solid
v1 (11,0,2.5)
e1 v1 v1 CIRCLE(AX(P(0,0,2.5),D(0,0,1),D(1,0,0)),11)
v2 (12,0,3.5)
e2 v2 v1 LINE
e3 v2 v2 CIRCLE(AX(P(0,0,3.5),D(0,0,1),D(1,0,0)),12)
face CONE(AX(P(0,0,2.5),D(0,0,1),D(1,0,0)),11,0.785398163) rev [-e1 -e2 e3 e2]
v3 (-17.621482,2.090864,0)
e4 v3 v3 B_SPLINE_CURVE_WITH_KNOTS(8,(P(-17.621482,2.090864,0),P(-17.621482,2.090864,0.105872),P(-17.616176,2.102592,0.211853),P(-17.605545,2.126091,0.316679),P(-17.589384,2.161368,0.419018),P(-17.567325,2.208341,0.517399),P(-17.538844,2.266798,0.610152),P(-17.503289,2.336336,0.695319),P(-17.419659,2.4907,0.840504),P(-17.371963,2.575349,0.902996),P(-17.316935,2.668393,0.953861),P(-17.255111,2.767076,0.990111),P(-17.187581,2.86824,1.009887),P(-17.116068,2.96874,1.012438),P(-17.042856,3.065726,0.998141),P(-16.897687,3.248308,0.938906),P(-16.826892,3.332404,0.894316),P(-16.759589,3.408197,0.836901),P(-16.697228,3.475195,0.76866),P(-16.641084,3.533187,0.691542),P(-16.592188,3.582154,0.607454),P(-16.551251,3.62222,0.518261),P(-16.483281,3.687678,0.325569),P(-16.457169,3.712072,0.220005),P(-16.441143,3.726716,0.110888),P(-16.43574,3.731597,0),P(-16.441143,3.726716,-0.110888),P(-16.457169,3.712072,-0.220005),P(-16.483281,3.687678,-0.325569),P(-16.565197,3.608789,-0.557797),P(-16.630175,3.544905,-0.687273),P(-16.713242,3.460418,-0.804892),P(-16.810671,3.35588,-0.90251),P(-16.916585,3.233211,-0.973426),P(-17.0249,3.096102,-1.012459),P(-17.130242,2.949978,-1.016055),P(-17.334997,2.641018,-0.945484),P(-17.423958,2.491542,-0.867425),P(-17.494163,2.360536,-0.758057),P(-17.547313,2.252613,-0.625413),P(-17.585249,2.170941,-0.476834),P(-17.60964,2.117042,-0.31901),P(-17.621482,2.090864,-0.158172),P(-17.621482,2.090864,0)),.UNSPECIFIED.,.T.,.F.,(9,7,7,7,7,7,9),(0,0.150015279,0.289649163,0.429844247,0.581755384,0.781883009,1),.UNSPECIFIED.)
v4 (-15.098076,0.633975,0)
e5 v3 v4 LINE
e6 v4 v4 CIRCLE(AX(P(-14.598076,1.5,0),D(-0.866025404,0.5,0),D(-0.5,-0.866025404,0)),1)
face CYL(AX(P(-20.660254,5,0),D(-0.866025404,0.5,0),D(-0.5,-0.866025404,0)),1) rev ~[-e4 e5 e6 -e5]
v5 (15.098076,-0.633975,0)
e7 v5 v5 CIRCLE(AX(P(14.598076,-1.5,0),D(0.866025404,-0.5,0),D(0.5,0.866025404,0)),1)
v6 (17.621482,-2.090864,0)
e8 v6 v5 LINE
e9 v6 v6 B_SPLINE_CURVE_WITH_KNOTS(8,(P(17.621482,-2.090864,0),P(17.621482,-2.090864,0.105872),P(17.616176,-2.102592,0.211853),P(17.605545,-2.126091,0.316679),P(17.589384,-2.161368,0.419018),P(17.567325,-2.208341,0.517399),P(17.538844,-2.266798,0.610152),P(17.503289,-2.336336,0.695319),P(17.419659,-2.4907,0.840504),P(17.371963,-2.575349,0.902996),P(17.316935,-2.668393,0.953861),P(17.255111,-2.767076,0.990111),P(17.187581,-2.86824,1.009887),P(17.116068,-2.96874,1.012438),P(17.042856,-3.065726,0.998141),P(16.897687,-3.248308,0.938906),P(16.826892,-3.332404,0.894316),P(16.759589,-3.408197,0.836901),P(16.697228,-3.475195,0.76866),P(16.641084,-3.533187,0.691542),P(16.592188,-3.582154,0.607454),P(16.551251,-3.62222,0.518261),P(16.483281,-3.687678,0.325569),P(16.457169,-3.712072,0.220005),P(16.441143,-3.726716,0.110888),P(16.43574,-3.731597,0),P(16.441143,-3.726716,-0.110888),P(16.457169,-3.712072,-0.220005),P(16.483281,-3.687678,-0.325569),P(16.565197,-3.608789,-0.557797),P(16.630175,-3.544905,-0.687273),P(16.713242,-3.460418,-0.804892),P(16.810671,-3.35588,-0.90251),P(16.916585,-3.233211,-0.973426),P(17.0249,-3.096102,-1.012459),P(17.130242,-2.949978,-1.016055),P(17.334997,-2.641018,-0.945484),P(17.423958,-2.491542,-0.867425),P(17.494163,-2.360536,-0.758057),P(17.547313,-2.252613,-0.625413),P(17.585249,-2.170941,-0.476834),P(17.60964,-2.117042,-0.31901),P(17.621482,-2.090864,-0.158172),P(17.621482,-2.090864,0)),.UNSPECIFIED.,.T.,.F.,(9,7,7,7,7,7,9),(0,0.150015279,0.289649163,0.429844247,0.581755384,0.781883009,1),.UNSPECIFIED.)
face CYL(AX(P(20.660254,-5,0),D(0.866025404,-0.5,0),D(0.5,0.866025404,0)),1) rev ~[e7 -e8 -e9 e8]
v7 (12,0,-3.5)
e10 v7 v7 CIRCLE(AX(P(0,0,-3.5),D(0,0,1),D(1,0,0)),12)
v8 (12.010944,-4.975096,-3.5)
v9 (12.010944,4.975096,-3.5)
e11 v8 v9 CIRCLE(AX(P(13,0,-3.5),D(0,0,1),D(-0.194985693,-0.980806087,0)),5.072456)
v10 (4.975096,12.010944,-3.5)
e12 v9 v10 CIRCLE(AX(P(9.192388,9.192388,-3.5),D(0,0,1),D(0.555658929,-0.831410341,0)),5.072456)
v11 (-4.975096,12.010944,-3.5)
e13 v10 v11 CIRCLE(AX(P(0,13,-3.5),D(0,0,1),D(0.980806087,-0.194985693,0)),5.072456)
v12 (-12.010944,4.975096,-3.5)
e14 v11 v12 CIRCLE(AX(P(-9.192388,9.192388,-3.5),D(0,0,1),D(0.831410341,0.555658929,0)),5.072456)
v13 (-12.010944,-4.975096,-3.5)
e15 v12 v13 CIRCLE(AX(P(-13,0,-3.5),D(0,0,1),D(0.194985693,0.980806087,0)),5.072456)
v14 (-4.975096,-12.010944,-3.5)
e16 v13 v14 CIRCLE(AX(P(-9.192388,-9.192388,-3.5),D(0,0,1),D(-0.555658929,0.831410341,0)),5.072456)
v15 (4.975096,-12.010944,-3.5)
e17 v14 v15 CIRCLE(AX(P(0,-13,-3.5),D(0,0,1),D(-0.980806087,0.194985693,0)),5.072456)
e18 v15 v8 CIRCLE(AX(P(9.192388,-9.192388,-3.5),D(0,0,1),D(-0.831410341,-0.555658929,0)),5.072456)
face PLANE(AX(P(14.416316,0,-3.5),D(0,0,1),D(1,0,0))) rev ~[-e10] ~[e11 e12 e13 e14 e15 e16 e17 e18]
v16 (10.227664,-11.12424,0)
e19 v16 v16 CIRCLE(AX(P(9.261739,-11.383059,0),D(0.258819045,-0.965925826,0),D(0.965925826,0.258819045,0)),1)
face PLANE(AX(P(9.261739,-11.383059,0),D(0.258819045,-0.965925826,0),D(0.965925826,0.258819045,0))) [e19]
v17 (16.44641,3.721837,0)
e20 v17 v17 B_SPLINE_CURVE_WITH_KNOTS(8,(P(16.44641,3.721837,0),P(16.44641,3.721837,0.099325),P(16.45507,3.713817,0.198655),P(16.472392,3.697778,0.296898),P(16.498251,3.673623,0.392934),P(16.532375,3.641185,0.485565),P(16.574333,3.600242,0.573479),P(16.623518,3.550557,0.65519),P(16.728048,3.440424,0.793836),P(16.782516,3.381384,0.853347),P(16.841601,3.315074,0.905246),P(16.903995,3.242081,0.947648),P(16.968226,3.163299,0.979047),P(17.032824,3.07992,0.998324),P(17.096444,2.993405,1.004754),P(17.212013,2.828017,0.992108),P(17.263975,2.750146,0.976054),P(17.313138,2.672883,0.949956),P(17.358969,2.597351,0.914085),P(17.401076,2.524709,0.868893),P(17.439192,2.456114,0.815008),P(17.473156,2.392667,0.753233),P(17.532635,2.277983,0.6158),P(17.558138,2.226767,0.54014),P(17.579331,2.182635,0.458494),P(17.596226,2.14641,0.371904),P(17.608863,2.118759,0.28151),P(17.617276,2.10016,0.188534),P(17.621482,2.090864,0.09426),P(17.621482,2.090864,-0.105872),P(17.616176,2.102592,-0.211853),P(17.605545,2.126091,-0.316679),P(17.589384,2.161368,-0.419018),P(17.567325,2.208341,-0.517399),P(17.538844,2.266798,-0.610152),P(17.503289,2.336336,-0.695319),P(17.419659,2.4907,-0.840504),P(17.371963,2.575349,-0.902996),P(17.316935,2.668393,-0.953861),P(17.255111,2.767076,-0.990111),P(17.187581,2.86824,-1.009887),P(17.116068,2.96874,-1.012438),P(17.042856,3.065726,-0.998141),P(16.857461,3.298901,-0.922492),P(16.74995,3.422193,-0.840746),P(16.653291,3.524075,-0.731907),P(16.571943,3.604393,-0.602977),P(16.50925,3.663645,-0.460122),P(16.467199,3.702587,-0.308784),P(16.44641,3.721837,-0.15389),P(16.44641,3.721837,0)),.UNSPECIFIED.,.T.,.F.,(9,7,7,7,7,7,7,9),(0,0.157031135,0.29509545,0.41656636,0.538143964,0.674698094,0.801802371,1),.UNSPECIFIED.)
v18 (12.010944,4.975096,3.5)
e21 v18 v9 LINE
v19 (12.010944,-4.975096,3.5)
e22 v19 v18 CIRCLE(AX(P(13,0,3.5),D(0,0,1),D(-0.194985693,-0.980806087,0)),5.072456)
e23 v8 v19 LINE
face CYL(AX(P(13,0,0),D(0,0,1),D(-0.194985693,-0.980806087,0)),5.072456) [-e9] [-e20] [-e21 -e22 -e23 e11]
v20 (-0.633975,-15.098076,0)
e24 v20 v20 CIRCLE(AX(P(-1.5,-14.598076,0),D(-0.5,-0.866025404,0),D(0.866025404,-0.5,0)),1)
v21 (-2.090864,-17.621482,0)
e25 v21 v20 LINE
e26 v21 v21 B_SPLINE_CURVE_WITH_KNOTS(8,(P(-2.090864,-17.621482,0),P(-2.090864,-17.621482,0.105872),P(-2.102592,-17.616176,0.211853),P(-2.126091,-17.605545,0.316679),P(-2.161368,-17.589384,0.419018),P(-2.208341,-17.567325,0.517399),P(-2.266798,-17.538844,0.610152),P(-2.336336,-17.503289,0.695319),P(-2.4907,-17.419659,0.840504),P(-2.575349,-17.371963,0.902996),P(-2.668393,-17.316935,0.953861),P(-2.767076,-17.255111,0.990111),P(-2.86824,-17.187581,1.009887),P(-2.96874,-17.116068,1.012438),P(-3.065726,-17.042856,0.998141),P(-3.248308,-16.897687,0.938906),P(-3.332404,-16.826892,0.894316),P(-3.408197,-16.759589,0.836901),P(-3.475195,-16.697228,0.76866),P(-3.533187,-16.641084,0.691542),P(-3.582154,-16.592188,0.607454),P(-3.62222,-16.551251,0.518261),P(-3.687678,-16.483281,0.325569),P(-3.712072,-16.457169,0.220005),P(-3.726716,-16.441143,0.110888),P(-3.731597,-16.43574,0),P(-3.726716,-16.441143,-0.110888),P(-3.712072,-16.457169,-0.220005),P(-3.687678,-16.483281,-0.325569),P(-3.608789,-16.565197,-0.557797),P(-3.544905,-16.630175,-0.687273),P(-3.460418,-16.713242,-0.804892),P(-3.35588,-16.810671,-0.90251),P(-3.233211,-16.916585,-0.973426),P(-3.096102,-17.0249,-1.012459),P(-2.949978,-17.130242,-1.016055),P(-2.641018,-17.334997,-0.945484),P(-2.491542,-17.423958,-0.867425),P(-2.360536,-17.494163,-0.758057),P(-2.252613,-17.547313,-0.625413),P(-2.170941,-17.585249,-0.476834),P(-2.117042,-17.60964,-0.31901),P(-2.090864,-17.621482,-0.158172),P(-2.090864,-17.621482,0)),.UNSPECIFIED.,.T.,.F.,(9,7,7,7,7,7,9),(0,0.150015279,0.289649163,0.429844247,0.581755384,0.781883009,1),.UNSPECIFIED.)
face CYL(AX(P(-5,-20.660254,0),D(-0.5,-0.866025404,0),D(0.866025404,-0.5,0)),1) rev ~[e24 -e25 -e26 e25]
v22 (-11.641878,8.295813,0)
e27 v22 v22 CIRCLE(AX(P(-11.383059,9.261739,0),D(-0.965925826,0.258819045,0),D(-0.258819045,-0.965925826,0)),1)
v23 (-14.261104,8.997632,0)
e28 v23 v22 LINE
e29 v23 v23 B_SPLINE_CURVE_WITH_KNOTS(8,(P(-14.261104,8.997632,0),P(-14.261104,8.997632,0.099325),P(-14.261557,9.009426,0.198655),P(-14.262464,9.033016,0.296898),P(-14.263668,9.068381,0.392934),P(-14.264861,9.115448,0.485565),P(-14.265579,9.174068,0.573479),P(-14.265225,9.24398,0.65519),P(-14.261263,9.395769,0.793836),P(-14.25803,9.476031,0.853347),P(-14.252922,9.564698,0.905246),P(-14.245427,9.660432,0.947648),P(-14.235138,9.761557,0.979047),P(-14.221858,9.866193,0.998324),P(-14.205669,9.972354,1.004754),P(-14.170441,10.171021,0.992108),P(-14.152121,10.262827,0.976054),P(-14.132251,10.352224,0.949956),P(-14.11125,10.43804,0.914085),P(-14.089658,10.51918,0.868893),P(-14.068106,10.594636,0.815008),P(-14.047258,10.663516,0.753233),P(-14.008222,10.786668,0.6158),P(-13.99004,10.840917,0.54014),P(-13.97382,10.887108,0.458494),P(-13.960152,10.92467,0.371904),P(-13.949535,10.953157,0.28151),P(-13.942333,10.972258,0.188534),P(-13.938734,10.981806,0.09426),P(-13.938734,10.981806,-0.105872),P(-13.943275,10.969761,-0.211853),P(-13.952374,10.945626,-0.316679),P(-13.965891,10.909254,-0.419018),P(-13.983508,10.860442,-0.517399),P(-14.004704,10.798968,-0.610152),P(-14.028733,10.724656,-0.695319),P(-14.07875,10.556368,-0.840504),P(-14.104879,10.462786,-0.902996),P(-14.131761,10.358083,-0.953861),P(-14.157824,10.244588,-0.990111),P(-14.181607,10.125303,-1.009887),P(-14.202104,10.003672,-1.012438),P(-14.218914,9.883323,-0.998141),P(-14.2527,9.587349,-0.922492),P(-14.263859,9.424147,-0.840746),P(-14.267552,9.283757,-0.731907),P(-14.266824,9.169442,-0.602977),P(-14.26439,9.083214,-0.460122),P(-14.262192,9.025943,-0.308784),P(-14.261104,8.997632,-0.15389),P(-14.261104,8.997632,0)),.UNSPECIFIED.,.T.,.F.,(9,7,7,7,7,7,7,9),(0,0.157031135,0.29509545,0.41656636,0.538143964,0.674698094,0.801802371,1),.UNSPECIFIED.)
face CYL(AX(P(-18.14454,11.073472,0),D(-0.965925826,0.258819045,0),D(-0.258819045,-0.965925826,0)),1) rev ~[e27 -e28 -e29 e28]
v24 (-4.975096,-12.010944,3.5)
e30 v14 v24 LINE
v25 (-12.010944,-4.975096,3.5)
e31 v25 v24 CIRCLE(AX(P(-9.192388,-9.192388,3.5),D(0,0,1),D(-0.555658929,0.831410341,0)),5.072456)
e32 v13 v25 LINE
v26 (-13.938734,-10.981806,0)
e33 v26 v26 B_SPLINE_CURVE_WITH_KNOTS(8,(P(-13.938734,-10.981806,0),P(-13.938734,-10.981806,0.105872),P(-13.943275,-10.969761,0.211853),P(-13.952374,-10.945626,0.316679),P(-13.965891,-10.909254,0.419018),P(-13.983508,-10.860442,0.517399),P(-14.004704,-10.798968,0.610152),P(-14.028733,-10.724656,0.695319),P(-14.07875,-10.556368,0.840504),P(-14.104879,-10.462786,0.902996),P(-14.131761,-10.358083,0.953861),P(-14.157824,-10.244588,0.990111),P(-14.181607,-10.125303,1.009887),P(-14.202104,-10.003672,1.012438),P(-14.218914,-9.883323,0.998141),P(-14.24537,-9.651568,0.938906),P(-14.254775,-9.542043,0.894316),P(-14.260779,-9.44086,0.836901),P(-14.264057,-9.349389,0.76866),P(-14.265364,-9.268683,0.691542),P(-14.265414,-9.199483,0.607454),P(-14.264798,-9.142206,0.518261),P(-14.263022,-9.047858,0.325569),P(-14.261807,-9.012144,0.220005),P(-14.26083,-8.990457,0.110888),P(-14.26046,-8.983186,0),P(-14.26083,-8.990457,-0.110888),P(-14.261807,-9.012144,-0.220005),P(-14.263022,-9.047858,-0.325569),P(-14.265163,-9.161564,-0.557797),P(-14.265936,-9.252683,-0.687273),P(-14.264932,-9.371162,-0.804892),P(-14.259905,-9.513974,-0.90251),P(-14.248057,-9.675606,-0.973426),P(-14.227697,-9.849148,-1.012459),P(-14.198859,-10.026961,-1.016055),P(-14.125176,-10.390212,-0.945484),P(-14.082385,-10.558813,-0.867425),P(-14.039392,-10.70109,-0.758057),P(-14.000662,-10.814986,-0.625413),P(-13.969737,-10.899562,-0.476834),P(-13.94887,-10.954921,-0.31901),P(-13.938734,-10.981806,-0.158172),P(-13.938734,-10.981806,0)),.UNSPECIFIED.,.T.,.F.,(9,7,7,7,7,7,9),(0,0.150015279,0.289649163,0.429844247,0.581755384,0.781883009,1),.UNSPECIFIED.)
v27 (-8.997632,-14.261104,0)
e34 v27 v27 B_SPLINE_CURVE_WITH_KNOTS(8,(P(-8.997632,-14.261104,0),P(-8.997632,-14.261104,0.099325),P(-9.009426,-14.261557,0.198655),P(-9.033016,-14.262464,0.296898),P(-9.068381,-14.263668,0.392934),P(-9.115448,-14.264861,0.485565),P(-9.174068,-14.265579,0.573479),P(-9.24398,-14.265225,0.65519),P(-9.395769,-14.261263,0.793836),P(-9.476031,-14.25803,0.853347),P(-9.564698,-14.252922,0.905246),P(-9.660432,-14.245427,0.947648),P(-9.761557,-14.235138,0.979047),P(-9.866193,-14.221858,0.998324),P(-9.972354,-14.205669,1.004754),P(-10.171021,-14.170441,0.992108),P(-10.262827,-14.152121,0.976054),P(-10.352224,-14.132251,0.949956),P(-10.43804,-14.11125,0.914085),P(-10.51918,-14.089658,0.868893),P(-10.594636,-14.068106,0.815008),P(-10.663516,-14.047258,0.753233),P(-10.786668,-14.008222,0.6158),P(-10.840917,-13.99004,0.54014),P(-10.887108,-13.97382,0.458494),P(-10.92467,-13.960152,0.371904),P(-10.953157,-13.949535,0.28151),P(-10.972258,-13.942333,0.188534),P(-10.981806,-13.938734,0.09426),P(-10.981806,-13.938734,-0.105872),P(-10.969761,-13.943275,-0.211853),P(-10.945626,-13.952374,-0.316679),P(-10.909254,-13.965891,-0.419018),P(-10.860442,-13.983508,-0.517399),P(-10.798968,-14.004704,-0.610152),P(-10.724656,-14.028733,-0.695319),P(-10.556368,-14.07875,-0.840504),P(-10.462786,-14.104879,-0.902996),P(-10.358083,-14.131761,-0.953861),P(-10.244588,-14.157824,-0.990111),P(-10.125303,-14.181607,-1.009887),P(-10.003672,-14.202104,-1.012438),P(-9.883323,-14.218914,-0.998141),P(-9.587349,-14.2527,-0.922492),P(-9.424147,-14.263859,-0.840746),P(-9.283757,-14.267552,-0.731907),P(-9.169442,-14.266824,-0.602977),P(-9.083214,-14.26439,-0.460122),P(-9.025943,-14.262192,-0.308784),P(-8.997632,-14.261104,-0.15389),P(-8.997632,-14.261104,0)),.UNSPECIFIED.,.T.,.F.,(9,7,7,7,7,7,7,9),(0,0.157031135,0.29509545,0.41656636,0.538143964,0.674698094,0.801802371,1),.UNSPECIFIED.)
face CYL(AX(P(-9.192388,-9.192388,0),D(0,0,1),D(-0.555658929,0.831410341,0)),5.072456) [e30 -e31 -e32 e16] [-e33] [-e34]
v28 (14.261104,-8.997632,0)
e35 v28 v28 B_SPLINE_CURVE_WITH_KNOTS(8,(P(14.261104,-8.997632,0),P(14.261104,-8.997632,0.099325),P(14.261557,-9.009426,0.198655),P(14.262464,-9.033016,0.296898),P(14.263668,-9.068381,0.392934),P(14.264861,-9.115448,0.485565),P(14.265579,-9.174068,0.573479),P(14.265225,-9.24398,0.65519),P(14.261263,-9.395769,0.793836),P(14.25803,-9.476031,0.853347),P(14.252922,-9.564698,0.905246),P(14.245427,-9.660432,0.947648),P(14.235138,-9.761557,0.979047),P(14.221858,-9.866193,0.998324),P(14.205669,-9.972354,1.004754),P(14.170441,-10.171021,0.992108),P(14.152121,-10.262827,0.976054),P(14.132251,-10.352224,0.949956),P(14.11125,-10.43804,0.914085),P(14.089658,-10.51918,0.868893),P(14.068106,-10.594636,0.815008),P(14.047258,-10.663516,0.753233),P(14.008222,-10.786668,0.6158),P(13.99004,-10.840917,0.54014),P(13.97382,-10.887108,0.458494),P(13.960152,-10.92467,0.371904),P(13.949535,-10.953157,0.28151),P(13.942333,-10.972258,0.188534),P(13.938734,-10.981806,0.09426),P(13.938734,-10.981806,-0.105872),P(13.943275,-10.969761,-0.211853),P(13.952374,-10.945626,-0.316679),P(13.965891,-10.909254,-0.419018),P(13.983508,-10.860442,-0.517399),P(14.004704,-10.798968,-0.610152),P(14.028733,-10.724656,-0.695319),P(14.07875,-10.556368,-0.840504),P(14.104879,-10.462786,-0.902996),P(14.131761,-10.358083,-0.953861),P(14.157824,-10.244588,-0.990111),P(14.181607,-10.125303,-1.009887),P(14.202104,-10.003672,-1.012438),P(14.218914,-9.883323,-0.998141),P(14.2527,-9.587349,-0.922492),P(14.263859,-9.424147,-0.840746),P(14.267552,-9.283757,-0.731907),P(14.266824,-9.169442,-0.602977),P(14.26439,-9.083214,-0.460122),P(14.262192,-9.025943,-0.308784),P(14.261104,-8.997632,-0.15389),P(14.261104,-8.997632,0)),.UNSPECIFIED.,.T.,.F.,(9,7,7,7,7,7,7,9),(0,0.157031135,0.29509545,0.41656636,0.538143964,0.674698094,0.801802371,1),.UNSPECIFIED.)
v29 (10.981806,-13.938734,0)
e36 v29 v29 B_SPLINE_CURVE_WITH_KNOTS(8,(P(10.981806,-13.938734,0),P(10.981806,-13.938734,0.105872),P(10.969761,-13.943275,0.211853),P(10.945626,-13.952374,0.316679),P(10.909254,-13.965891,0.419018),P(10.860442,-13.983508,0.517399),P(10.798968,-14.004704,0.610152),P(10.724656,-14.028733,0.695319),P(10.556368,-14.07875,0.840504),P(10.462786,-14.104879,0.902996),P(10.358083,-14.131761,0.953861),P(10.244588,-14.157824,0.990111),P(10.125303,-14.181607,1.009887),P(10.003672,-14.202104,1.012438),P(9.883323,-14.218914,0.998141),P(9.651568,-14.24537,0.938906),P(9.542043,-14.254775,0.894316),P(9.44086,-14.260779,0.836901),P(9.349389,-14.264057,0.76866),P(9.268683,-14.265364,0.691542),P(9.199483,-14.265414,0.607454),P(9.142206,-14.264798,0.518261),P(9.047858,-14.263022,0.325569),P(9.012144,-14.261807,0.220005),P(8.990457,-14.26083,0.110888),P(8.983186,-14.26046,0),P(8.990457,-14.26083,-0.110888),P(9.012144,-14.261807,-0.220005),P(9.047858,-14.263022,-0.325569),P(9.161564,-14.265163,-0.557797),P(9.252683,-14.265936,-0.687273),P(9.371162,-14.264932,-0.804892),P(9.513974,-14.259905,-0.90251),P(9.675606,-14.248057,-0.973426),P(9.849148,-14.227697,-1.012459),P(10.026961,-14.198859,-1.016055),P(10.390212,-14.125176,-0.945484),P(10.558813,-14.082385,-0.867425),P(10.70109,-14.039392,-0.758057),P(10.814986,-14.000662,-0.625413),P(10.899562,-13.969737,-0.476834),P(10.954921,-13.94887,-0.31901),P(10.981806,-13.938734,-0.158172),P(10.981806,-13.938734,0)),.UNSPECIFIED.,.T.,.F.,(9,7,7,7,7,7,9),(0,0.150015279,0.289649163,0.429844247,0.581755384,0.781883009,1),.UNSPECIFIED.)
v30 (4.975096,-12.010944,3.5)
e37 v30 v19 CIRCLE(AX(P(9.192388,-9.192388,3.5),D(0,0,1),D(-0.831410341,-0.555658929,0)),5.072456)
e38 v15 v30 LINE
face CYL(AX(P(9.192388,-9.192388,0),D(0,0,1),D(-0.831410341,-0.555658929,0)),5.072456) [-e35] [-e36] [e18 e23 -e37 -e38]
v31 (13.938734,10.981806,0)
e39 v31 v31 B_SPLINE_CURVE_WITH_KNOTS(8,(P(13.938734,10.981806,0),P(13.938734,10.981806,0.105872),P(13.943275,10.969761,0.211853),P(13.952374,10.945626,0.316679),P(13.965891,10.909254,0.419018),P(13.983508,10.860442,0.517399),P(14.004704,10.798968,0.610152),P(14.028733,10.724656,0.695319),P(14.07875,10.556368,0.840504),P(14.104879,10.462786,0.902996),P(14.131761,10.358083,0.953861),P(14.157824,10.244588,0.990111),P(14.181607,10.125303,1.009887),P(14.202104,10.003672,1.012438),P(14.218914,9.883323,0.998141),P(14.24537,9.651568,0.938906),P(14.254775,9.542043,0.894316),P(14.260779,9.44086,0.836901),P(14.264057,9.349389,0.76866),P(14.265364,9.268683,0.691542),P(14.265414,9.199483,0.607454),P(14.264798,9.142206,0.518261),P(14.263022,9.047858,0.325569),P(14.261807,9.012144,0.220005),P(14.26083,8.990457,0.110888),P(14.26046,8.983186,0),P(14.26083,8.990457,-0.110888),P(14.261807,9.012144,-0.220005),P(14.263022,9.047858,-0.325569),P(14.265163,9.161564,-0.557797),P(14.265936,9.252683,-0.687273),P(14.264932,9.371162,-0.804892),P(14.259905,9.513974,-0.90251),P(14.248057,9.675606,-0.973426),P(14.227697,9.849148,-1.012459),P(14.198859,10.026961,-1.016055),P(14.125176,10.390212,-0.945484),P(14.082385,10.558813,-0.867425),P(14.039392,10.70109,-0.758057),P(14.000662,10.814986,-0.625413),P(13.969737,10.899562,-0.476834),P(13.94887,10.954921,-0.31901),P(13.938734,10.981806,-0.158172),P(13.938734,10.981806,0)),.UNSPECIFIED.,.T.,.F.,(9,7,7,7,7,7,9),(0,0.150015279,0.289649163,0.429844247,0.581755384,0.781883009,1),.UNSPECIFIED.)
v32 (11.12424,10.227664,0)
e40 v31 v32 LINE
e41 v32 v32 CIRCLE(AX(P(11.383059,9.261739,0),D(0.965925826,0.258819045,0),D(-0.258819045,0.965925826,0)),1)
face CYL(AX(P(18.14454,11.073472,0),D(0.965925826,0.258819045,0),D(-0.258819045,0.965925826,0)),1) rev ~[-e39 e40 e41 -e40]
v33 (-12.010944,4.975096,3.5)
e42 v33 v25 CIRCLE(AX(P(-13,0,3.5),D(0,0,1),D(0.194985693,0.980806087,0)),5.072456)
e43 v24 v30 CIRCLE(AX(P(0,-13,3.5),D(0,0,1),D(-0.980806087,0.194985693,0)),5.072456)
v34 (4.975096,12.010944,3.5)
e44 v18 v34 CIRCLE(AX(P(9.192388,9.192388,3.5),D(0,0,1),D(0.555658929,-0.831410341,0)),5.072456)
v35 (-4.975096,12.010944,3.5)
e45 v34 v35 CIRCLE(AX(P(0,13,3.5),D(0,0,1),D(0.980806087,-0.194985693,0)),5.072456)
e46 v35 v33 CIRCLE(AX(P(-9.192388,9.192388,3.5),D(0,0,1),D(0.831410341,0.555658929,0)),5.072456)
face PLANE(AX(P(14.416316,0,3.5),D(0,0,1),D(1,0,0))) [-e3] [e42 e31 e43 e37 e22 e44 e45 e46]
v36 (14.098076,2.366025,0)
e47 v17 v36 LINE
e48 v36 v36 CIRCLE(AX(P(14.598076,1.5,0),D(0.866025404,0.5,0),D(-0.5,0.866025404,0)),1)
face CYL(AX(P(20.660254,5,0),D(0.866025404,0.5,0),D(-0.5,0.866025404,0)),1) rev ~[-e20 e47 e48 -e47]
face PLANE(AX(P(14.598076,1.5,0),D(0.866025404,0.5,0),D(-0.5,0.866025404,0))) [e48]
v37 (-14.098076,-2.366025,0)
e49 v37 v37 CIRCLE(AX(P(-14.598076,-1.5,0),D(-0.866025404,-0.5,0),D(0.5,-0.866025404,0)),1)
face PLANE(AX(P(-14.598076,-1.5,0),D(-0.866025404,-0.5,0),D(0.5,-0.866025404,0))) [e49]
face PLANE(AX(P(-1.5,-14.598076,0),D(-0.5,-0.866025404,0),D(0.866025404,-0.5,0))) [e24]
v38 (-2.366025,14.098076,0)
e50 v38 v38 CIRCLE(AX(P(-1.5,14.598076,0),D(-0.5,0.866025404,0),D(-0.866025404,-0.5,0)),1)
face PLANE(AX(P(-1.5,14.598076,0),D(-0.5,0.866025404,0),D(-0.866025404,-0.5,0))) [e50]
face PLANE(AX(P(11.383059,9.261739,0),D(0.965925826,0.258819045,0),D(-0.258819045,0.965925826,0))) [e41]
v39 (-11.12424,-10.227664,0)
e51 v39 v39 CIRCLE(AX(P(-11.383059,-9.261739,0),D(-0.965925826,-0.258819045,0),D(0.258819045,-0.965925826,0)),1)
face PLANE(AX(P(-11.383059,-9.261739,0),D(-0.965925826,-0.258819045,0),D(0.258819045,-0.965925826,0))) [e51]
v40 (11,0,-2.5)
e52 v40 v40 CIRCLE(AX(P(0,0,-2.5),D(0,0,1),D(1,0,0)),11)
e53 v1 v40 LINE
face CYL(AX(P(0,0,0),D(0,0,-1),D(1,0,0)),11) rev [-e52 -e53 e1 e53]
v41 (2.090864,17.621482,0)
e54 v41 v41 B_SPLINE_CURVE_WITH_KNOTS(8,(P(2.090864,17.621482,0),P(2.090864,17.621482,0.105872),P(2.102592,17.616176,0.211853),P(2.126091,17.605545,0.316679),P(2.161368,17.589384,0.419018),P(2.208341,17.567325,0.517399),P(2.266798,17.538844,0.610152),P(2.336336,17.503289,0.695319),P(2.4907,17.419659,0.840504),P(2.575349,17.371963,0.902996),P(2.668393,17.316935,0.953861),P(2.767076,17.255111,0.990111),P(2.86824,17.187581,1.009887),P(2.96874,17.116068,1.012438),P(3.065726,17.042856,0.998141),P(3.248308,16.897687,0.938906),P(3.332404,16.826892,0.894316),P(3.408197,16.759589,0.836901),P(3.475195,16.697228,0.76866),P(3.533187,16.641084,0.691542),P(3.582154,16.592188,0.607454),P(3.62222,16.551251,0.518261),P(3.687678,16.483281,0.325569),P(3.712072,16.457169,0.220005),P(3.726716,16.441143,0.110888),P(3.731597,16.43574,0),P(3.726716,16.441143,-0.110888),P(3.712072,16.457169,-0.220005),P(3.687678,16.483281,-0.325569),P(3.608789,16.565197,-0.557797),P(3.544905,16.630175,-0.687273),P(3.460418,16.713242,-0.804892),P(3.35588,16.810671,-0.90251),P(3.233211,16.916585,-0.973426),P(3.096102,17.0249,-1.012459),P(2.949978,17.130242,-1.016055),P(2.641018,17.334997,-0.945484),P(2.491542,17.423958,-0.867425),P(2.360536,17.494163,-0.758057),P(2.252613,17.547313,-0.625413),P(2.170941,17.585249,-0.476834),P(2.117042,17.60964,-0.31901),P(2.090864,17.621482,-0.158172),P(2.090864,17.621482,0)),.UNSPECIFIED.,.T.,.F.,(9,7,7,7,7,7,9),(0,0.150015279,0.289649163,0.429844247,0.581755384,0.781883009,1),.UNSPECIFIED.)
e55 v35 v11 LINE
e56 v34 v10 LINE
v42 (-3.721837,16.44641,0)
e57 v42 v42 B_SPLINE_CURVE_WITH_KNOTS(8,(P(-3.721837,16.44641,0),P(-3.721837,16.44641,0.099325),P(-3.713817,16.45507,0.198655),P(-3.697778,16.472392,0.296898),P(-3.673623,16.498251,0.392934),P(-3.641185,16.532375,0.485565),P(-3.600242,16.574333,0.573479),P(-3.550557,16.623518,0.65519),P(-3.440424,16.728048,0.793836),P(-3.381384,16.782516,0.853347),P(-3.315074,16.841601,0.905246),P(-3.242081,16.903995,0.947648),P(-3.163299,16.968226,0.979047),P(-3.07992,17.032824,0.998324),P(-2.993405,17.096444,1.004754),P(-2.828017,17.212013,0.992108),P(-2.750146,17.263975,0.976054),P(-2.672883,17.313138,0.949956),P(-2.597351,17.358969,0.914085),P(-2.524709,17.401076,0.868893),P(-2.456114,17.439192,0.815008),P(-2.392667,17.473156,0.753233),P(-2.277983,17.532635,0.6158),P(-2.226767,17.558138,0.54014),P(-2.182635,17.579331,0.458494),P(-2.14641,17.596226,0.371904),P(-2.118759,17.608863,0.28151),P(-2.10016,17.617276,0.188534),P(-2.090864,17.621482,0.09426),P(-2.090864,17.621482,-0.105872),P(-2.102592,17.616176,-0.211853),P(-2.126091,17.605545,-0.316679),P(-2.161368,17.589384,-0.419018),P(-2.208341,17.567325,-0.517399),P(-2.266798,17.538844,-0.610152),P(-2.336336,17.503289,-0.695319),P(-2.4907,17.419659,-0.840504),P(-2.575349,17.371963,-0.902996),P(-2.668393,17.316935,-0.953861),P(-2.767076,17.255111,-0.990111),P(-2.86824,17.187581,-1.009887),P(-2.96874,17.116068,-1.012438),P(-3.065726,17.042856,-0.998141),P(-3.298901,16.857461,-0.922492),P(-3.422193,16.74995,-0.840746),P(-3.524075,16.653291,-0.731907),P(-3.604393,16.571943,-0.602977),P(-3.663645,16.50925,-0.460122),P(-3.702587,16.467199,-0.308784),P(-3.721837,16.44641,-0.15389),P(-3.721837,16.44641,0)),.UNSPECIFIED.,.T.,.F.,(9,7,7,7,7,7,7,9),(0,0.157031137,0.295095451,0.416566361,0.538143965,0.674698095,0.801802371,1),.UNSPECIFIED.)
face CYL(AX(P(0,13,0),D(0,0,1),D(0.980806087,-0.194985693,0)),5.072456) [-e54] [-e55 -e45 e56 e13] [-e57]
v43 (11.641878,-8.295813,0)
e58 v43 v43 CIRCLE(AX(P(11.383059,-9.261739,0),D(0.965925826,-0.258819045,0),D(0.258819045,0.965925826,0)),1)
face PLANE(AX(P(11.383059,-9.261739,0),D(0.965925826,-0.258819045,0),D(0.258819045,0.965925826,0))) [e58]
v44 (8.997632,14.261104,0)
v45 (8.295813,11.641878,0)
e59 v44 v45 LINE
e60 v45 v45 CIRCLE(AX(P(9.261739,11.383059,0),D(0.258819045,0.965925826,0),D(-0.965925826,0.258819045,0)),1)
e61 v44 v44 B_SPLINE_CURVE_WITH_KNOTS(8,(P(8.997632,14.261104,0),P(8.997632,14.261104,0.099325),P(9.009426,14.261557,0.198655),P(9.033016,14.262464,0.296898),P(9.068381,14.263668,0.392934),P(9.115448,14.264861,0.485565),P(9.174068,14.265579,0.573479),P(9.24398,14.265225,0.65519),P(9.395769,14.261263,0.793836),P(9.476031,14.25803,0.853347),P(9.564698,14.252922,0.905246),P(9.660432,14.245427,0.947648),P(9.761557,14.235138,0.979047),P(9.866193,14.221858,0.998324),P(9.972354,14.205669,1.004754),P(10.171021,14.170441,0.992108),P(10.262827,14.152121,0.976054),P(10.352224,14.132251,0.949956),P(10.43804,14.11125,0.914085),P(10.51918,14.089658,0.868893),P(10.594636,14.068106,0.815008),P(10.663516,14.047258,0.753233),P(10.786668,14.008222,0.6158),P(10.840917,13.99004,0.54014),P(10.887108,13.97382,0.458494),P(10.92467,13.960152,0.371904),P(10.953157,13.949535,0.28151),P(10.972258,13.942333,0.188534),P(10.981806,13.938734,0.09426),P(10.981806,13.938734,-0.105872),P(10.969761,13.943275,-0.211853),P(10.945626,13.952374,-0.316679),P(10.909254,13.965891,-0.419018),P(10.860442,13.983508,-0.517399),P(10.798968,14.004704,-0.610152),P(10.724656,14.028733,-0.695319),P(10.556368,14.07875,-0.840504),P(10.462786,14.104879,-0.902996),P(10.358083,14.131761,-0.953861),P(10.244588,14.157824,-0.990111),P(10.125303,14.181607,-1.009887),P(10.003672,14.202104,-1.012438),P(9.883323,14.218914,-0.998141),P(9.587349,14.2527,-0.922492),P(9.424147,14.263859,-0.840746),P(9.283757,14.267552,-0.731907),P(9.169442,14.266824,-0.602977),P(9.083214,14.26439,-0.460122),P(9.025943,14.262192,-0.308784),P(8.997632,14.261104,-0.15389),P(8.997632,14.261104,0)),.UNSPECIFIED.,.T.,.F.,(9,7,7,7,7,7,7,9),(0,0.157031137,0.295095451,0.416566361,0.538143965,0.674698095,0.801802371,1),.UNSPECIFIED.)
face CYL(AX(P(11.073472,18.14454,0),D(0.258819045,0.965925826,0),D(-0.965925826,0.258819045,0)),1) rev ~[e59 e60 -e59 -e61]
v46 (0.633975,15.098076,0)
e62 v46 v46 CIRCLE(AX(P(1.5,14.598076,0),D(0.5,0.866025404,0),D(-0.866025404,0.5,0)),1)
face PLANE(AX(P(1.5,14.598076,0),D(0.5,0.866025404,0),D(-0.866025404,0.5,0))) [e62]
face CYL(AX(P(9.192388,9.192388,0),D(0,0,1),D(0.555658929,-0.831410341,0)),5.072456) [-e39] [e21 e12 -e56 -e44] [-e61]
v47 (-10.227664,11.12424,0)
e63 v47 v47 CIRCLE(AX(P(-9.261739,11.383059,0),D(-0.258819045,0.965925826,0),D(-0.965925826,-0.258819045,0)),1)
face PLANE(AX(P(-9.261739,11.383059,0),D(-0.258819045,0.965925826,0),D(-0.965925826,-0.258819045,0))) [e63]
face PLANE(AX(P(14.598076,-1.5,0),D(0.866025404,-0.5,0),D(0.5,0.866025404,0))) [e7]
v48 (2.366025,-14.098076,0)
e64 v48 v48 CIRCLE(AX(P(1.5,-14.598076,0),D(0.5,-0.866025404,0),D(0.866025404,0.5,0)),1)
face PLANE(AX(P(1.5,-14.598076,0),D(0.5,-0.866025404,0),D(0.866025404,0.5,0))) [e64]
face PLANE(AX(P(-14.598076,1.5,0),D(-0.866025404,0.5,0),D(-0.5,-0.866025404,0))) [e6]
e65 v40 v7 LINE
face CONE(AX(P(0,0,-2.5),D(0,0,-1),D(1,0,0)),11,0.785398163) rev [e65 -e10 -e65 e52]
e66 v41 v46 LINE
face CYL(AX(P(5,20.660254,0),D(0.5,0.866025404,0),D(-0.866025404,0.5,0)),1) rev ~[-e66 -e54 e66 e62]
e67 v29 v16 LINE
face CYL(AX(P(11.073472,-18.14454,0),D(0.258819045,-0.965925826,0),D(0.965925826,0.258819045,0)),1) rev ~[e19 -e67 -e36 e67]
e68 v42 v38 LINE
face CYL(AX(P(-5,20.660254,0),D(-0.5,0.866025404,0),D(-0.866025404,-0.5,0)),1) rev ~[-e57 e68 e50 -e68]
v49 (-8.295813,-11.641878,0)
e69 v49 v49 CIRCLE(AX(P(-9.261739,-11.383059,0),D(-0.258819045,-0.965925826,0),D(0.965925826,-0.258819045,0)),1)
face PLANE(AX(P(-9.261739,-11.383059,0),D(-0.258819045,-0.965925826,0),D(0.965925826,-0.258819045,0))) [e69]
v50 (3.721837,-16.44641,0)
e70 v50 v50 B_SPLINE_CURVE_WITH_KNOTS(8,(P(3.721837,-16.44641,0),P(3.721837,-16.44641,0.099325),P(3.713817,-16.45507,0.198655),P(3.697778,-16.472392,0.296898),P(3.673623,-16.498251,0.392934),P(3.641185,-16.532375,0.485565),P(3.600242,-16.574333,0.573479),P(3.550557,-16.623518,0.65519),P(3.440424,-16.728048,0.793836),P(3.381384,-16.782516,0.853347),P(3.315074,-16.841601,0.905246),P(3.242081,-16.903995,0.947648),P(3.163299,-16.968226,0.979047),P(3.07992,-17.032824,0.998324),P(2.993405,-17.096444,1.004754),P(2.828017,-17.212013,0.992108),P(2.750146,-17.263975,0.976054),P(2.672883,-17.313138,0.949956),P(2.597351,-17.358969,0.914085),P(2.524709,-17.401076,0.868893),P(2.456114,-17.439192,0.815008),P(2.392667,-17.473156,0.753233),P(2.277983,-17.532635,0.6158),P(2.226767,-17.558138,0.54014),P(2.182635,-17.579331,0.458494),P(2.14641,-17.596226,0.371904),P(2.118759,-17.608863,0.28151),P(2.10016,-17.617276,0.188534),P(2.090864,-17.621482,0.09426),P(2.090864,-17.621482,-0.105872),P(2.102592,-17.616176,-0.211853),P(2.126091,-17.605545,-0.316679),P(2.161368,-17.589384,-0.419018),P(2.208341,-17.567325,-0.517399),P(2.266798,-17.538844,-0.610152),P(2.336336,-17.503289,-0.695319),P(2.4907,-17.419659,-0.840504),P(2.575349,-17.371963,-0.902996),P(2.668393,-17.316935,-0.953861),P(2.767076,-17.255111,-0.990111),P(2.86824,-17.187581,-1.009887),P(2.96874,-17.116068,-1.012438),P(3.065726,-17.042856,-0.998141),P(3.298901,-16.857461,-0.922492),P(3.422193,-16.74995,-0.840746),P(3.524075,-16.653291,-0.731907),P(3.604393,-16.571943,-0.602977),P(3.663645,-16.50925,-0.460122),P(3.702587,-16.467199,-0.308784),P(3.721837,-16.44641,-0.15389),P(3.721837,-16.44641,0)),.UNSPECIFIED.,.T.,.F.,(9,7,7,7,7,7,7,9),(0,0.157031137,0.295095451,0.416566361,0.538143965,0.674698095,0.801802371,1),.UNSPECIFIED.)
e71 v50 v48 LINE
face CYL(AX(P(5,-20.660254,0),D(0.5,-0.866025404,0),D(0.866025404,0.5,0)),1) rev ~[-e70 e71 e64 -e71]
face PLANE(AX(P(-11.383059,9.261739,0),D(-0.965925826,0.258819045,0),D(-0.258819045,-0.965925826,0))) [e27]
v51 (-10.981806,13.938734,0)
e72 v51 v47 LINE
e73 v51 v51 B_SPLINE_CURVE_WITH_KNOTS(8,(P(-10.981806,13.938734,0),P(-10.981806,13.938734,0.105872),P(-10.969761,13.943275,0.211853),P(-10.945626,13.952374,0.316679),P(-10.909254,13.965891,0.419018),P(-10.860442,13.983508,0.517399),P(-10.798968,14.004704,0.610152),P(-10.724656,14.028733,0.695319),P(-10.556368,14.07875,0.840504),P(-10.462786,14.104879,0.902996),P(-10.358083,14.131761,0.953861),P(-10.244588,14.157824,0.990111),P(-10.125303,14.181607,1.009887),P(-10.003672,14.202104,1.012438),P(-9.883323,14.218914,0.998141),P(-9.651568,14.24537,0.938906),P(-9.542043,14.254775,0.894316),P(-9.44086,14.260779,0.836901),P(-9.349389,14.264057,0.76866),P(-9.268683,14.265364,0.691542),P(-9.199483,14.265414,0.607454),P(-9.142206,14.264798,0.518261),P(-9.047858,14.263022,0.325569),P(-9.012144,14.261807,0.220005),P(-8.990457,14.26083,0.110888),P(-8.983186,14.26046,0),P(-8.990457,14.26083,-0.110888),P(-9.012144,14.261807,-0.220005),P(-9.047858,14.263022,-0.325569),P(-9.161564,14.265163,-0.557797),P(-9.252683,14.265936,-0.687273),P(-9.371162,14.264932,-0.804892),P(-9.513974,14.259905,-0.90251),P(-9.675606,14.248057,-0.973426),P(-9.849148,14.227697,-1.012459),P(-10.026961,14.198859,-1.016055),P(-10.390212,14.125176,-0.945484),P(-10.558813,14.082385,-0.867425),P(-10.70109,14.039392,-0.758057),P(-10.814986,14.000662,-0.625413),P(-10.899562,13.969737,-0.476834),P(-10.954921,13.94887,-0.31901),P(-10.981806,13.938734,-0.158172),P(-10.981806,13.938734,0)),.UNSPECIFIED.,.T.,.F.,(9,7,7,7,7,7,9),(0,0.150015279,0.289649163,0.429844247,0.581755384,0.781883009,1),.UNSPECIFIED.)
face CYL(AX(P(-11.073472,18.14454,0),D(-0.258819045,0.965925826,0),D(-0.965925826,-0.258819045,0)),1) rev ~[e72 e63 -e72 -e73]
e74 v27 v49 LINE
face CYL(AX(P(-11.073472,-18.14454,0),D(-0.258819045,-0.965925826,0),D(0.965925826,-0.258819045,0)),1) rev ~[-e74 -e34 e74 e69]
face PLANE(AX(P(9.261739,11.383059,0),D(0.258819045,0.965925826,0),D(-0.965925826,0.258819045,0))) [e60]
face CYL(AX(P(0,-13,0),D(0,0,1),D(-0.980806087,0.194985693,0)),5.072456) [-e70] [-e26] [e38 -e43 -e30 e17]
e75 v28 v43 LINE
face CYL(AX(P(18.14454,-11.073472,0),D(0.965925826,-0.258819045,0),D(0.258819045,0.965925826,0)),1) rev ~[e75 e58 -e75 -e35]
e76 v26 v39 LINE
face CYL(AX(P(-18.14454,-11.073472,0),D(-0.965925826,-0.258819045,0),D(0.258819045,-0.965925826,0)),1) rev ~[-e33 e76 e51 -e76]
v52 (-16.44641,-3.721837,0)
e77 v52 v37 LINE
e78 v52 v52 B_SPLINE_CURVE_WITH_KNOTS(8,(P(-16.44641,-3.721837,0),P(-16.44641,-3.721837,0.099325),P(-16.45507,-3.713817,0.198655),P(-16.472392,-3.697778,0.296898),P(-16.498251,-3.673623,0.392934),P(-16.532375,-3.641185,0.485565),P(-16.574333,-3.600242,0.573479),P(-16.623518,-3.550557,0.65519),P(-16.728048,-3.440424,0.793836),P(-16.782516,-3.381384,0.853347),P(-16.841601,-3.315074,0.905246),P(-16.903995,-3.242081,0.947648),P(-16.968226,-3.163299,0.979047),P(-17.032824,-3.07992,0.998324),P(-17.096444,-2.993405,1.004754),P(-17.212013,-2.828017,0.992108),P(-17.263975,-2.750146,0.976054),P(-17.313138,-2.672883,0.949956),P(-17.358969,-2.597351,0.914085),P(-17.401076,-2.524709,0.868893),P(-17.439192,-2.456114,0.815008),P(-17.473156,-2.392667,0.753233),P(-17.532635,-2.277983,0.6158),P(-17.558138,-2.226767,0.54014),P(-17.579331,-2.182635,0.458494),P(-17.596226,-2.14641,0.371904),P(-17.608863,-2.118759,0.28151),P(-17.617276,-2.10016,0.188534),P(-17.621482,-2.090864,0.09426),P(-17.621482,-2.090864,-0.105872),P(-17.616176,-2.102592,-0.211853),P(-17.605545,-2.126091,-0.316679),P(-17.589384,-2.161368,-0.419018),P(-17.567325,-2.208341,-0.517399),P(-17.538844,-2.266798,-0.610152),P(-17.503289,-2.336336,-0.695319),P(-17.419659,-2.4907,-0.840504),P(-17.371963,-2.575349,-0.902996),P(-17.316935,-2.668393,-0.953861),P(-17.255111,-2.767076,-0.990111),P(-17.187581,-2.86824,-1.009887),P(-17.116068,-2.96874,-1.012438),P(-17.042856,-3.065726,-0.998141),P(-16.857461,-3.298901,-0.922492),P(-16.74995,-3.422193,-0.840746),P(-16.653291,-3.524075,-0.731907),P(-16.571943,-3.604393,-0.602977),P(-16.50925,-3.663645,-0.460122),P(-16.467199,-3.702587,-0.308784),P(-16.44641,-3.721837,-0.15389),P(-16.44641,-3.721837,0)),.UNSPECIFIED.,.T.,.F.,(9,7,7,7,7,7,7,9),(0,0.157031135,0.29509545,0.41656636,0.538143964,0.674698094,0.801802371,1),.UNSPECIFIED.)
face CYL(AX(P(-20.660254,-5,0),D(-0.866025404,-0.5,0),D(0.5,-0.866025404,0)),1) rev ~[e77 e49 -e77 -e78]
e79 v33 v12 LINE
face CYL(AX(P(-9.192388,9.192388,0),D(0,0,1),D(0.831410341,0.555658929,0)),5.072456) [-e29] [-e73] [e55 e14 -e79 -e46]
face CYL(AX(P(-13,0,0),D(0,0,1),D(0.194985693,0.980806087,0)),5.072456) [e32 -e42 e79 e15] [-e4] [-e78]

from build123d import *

# Parameters (mm, degrees)
F0_R             = 11
F1_DEPTH         = 3.5
F2_SIZE          = 1
F6_R             = 1
F7_DEPTH         = 7
F7_COPIES_COUNT  = 8
F9_R             = 1
F10_DEPTH        = 7
F10_COPIES_COUNT = 8


# Not quite as in the source:
# - a pattern or mirror of a feature is missing from the dataset's text; its kind, count and spacing are read off the source's solid


with BuildPart() as f1:
    # F0 (on Top) → F1 (new body, symmetric)
    with BuildSketch(Plane.XY):
        with BuildLine():
            ThreePointArc((12.0104759307, 4.9747832032), (12.750219353, 2.5361203541), (13, 0))
            ThreePointArc((13, 0), (12.750219353, -2.5361203541), (12.0104759307, -4.9747832032))
            ThreePointArc((12.0104759307, -4.9747832032), (12.0107097924, -4.9749394725), (12.0109436454, -4.9750957548))
            ThreePointArc((12.0109436454, -4.9750957548), (18.0724560365, 0), (12.0109436454, 4.9750957548))
            ThreePointArc((12.0109436454, 4.9750957548), (12.0107097924, 4.9749394725), (12.0104759307, 4.9747832032))
        make_face()
        with BuildLine():
            ThreePointArc((12.0103919138, 4.974986038), (12.0104339226, 4.9748846207), (12.0104759307, 4.9747832032))
            ThreePointArc((12.0104759307, 4.9747832032), (12.0107097924, 4.9749394725), (12.0109436454, 4.9750957548))
            ThreePointArc((12.0109436454, 4.9750957548), (12.0106677781, 4.975040904), (12.0103919138, 4.974986038))
        make_face()
        with BuildLine():
            ThreePointArc((12.0109436454, -4.9750957548), (12.0107097924, -4.9749394725), (12.0104759307, -4.9747832032))
            ThreePointArc((12.0104759307, -4.9747832032), (12.0104339226, -4.9748846207), (12.0103919138, -4.974986038))
            ThreePointArc((12.0103919138, -4.974986038), (12.0106677781, -4.975040904), (12.0109436454, -4.9750957548))
        make_face()
        with BuildLine():
            ThreePointArc((4.974986038, 12.0103919138), (9.1923881554, 9.1923881554), (12.0103919138, 4.974986038))
            ThreePointArc((12.0103919138, 4.974986038), (12.0106677781, 4.975040904), (12.0109436454, 4.9750957548))
            ThreePointArc((12.0109436454, 4.9750957548), (12.7791562161, 12.7791562161), (4.9750957548, 12.0109436454))
            ThreePointArc((4.9750957548, 12.0109436454), (4.975040904, 12.0106677781), (4.974986038, 12.0103919138))
        make_face()
        with BuildLine():
            ThreePointArc((12.0109436454, -4.9750957548), (12.0106677781, -4.975040904), (12.0103919138, -4.974986038))
            ThreePointArc((12.0103919138, -4.974986038), (9.1923881554, -9.1923881554), (4.974986038, -12.0103919138))
            ThreePointArc((4.974986038, -12.0103919138), (4.975040904, -12.0106677781), (4.9750957548, -12.0109436454))
            ThreePointArc((4.9750957548, -12.0109436454), (12.7791562161, -12.7791562161), (12.0109436454, -4.9750957548))
        make_face()
        with BuildLine():
            ThreePointArc((4.9747832032, 12.0104759307), (4.9748846207, 12.0104339226), (4.974986038, 12.0103919138))
            ThreePointArc((4.974986038, 12.0103919138), (4.975040904, 12.0106677781), (4.9750957548, 12.0109436454))
            ThreePointArc((4.9750957548, 12.0109436454), (4.9749394725, 12.0107097924), (4.9747832032, 12.0104759307))
        make_face()
        with BuildLine():
            ThreePointArc((4.9747832032, 12.0104759307), (4.9749394725, 12.0107097924), (4.9750957548, 12.0109436454))
            ThreePointArc((4.9750957548, 12.0109436454), (0, 18.0724560365), (-4.9750957548, 12.0109436454))
            ThreePointArc((-4.9750957548, 12.0109436454), (-4.9749394725, 12.0107097924), (-4.9747832032, 12.0104759307))
            ThreePointArc((-4.9747832032, 12.0104759307), (0, 13), (4.9747832032, 12.0104759307))
        make_face()
        with BuildLine():
            ThreePointArc((4.9750957548, -12.0109436454), (4.975040904, -12.0106677781), (4.974986038, -12.0103919138))
            ThreePointArc((4.974986038, -12.0103919138), (4.9748846207, -12.0104339226), (4.9747832032, -12.0104759307))
            ThreePointArc((4.9747832032, -12.0104759307), (4.9749394725, -12.0107097924), (4.9750957548, -12.0109436454))
        make_face()
        with BuildLine():
            ThreePointArc((-4.9750957548, -12.0109436454), (0, -18.0724560365), (4.9750957548, -12.0109436454))
            ThreePointArc((4.9750957548, -12.0109436454), (4.9749394725, -12.0107097924), (4.9747832032, -12.0104759307))
            ThreePointArc((4.9747832032, -12.0104759307), (0, -13), (-4.9747832032, -12.0104759307))
            ThreePointArc((-4.9747832032, -12.0104759307), (-4.9749394725, -12.0107097924), (-4.9750957548, -12.0109436454))
        make_face()
        with BuildLine():
            ThreePointArc((-4.9747832032, 12.0104759307), (-4.9749394725, 12.0107097924), (-4.9750957548, 12.0109436454))
            ThreePointArc((-4.9750957548, 12.0109436454), (-4.975040904, 12.0106677781), (-4.974986038, 12.0103919138))
            ThreePointArc((-4.974986038, 12.0103919138), (-4.9748846207, 12.0104339226), (-4.9747832032, 12.0104759307))
        make_face()
        with BuildLine():
            ThreePointArc((-4.974986038, 12.0103919138), (-4.975040904, 12.0106677781), (-4.9750957548, 12.0109436454))
            ThreePointArc((-4.9750957548, 12.0109436454), (-12.7791562161, 12.7791562161), (-12.0109436454, 4.9750957548))
            ThreePointArc((-12.0109436454, 4.9750957548), (-12.0106677781, 4.975040904), (-12.0103919138, 4.974986038))
            ThreePointArc((-12.0103919138, 4.974986038), (-9.1923881554, 9.1923881554), (-4.974986038, 12.0103919138))
        make_face()
        with BuildLine():
            ThreePointArc((-4.974986038, -12.0103919138), (-4.975040904, -12.0106677781), (-4.9750957548, -12.0109436454))
            ThreePointArc((-4.9750957548, -12.0109436454), (-4.9749394725, -12.0107097924), (-4.9747832032, -12.0104759307))
            ThreePointArc((-4.9747832032, -12.0104759307), (-4.9748846207, -12.0104339226), (-4.974986038, -12.0103919138))
        make_face()
        with BuildLine():
            ThreePointArc((-12.0109436454, -4.9750957548), (-12.7791562161, -12.7791562161), (-4.9750957548, -12.0109436454))
            ThreePointArc((-4.9750957548, -12.0109436454), (-4.975040904, -12.0106677781), (-4.974986038, -12.0103919138))
            ThreePointArc((-4.974986038, -12.0103919138), (-9.1923881554, -9.1923881554), (-12.0103919138, -4.974986038))
            ThreePointArc((-12.0103919138, -4.974986038), (-12.0106677781, -4.975040904), (-12.0109436454, -4.9750957548))
        make_face()
        with BuildLine():
            ThreePointArc((-12.0103919138, 4.974986038), (-12.0106677781, 4.975040904), (-12.0109436454, 4.9750957548))
            ThreePointArc((-12.0109436454, 4.9750957548), (-12.0107097924, 4.9749394725), (-12.0104759307, 4.9747832032))
            ThreePointArc((-12.0104759307, 4.9747832032), (-12.0104339226, 4.9748846207), (-12.0103919138, 4.974986038))
        make_face()
        with BuildLine():
            ThreePointArc((-12.0104759307, 4.9747832032), (-12.0107097924, 4.9749394725), (-12.0109436454, 4.9750957548))
            ThreePointArc((-12.0109436454, 4.9750957548), (-18.0724560365, 0), (-12.0109436454, -4.9750957548))
            ThreePointArc((-12.0109436454, -4.9750957548), (-12.0107097924, -4.9749394725), (-12.0104759307, -4.9747832032))
            ThreePointArc((-12.0104759307, -4.9747832032), (-13, 0), (-12.0104759307, 4.9747832032))
        make_face()
        with BuildLine():
            ThreePointArc((-12.0104759307, -4.9747832032), (-12.0107097924, -4.9749394725), (-12.0109436454, -4.9750957548))
            ThreePointArc((-12.0109436454, -4.9750957548), (-12.0106677781, -4.975040904), (-12.0103919138, -4.974986038))
            ThreePointArc((-12.0103919138, -4.974986038), (-12.0104339226, -4.9748846207), (-12.0104759307, -4.9747832032))
        make_face()
        with BuildLine():
            ThreePointArc((12.0104759307, -4.9747832032), (12.750219353, -2.5361203541), (13, 0))
            ThreePointArc((13, 0), (12.750219353, 2.5361203541), (12.0104759307, 4.9747832032))
            ThreePointArc((12.0104759307, 4.9747832032), (12.0104339226, 4.9748846207), (12.0103919138, 4.974986038))
            ThreePointArc((12.0103919138, 4.974986038), (9.1923881554, 9.1923881554), (4.974986038, 12.0103919138))
            ThreePointArc((4.974986038, 12.0103919138), (4.9748846207, 12.0104339226), (4.9747832032, 12.0104759307))
            ThreePointArc((4.9747832032, 12.0104759307), (0, 13), (-4.9747832032, 12.0104759307))
            ThreePointArc((-4.9747832032, 12.0104759307), (-4.9748846207, 12.0104339226), (-4.974986038, 12.0103919138))
            ThreePointArc((-4.974986038, 12.0103919138), (-9.1923881554, 9.1923881554), (-12.0103919138, 4.974986038))
            ThreePointArc((-12.0103919138, 4.974986038), (-12.0104339226, 4.9748846207), (-12.0104759307, 4.9747832032))
            ThreePointArc((-12.0104759307, 4.9747832032), (-13, 0), (-12.0104759307, -4.9747832032))
            ThreePointArc((-12.0104759307, -4.9747832032), (-12.0104339226, -4.9748846207), (-12.0103919138, -4.974986038))
            ThreePointArc((-12.0103919138, -4.974986038), (-9.1923881554, -9.1923881554), (-4.974986038, -12.0103919138))
            ThreePointArc((-4.974986038, -12.0103919138), (-4.9748846207, -12.0104339226), (-4.9747832032, -12.0104759307))
            ThreePointArc((-4.9747832032, -12.0104759307), (0, -13), (4.9747832032, -12.0104759307))
            ThreePointArc((4.9747832032, -12.0104759307), (4.9748846207, -12.0104339226), (4.974986038, -12.0103919138))
            ThreePointArc((4.974986038, -12.0103919138), (9.1923881554, -9.1923881554), (12.0103919138, -4.974986038))
            ThreePointArc((12.0103919138, -4.974986038), (12.0104339226, -4.9748846207), (12.0104759307, -4.9747832032))
        make_face()
        Circle(F0_R, mode=Mode.SUBTRACT)
    extrude(amount=F1_DEPTH, both=True)

    # F2
    f2_edges = [f1.edges().sort_by_distance(p)[0] for p in [
        (-11, 0, 3.5),
        (-11, 0, -3.5),
    ]]
    chamfer(f2_edges, length=F2_SIZE)

    # F6 (on line) → F7 (cut)
    with BuildSketch(Plane(origin=(-5.2779168675, 19.6974539077, 0), x_dir=(-0.9659258263, -0.2588190451, 0), z_dir=(-0.2588190451, 0.9659258263, 0))):
        with Locations((6, 0)):
            Circle(F6_R)
    f7 = extrude(amount=-F7_DEPTH, mode=Mode.SUBTRACT)

    # F7_copies: F7 ×8 about axis
    f7_copies_axis = Axis((0, 0, 0), (0, 0, 1))
    for i in range(1, F7_COPIES_COUNT):
        add(f7.rotate(f7_copies_axis, i * 360 / F7_COPIES_COUNT), mode=Mode.SUBTRACT)

    # F9 (on line) → F10 (cut)
    with BuildSketch(Plane(origin=(-19.6974539077, 5.2779168675, 0), x_dir=(-0.2588190451, -0.9659258263, 0), z_dir=(-0.9659258263, 0.2588190451, 0))):
        with Locations((-6, 0)):
            Circle(F9_R)
    f10 = extrude(amount=-F10_DEPTH, mode=Mode.SUBTRACT)

    # F10_copies: F10 ×8 about axis
    f10_copies_axis = Axis((0, 0, 0), (0, 0, 1))
    for i in range(1, F10_COPIES_COUNT):
        add(f10.rotate(f10_copies_axis, i * 360 / F10_COPIES_COUNT), mode=Mode.SUBTRACT)


solid = f1.part
